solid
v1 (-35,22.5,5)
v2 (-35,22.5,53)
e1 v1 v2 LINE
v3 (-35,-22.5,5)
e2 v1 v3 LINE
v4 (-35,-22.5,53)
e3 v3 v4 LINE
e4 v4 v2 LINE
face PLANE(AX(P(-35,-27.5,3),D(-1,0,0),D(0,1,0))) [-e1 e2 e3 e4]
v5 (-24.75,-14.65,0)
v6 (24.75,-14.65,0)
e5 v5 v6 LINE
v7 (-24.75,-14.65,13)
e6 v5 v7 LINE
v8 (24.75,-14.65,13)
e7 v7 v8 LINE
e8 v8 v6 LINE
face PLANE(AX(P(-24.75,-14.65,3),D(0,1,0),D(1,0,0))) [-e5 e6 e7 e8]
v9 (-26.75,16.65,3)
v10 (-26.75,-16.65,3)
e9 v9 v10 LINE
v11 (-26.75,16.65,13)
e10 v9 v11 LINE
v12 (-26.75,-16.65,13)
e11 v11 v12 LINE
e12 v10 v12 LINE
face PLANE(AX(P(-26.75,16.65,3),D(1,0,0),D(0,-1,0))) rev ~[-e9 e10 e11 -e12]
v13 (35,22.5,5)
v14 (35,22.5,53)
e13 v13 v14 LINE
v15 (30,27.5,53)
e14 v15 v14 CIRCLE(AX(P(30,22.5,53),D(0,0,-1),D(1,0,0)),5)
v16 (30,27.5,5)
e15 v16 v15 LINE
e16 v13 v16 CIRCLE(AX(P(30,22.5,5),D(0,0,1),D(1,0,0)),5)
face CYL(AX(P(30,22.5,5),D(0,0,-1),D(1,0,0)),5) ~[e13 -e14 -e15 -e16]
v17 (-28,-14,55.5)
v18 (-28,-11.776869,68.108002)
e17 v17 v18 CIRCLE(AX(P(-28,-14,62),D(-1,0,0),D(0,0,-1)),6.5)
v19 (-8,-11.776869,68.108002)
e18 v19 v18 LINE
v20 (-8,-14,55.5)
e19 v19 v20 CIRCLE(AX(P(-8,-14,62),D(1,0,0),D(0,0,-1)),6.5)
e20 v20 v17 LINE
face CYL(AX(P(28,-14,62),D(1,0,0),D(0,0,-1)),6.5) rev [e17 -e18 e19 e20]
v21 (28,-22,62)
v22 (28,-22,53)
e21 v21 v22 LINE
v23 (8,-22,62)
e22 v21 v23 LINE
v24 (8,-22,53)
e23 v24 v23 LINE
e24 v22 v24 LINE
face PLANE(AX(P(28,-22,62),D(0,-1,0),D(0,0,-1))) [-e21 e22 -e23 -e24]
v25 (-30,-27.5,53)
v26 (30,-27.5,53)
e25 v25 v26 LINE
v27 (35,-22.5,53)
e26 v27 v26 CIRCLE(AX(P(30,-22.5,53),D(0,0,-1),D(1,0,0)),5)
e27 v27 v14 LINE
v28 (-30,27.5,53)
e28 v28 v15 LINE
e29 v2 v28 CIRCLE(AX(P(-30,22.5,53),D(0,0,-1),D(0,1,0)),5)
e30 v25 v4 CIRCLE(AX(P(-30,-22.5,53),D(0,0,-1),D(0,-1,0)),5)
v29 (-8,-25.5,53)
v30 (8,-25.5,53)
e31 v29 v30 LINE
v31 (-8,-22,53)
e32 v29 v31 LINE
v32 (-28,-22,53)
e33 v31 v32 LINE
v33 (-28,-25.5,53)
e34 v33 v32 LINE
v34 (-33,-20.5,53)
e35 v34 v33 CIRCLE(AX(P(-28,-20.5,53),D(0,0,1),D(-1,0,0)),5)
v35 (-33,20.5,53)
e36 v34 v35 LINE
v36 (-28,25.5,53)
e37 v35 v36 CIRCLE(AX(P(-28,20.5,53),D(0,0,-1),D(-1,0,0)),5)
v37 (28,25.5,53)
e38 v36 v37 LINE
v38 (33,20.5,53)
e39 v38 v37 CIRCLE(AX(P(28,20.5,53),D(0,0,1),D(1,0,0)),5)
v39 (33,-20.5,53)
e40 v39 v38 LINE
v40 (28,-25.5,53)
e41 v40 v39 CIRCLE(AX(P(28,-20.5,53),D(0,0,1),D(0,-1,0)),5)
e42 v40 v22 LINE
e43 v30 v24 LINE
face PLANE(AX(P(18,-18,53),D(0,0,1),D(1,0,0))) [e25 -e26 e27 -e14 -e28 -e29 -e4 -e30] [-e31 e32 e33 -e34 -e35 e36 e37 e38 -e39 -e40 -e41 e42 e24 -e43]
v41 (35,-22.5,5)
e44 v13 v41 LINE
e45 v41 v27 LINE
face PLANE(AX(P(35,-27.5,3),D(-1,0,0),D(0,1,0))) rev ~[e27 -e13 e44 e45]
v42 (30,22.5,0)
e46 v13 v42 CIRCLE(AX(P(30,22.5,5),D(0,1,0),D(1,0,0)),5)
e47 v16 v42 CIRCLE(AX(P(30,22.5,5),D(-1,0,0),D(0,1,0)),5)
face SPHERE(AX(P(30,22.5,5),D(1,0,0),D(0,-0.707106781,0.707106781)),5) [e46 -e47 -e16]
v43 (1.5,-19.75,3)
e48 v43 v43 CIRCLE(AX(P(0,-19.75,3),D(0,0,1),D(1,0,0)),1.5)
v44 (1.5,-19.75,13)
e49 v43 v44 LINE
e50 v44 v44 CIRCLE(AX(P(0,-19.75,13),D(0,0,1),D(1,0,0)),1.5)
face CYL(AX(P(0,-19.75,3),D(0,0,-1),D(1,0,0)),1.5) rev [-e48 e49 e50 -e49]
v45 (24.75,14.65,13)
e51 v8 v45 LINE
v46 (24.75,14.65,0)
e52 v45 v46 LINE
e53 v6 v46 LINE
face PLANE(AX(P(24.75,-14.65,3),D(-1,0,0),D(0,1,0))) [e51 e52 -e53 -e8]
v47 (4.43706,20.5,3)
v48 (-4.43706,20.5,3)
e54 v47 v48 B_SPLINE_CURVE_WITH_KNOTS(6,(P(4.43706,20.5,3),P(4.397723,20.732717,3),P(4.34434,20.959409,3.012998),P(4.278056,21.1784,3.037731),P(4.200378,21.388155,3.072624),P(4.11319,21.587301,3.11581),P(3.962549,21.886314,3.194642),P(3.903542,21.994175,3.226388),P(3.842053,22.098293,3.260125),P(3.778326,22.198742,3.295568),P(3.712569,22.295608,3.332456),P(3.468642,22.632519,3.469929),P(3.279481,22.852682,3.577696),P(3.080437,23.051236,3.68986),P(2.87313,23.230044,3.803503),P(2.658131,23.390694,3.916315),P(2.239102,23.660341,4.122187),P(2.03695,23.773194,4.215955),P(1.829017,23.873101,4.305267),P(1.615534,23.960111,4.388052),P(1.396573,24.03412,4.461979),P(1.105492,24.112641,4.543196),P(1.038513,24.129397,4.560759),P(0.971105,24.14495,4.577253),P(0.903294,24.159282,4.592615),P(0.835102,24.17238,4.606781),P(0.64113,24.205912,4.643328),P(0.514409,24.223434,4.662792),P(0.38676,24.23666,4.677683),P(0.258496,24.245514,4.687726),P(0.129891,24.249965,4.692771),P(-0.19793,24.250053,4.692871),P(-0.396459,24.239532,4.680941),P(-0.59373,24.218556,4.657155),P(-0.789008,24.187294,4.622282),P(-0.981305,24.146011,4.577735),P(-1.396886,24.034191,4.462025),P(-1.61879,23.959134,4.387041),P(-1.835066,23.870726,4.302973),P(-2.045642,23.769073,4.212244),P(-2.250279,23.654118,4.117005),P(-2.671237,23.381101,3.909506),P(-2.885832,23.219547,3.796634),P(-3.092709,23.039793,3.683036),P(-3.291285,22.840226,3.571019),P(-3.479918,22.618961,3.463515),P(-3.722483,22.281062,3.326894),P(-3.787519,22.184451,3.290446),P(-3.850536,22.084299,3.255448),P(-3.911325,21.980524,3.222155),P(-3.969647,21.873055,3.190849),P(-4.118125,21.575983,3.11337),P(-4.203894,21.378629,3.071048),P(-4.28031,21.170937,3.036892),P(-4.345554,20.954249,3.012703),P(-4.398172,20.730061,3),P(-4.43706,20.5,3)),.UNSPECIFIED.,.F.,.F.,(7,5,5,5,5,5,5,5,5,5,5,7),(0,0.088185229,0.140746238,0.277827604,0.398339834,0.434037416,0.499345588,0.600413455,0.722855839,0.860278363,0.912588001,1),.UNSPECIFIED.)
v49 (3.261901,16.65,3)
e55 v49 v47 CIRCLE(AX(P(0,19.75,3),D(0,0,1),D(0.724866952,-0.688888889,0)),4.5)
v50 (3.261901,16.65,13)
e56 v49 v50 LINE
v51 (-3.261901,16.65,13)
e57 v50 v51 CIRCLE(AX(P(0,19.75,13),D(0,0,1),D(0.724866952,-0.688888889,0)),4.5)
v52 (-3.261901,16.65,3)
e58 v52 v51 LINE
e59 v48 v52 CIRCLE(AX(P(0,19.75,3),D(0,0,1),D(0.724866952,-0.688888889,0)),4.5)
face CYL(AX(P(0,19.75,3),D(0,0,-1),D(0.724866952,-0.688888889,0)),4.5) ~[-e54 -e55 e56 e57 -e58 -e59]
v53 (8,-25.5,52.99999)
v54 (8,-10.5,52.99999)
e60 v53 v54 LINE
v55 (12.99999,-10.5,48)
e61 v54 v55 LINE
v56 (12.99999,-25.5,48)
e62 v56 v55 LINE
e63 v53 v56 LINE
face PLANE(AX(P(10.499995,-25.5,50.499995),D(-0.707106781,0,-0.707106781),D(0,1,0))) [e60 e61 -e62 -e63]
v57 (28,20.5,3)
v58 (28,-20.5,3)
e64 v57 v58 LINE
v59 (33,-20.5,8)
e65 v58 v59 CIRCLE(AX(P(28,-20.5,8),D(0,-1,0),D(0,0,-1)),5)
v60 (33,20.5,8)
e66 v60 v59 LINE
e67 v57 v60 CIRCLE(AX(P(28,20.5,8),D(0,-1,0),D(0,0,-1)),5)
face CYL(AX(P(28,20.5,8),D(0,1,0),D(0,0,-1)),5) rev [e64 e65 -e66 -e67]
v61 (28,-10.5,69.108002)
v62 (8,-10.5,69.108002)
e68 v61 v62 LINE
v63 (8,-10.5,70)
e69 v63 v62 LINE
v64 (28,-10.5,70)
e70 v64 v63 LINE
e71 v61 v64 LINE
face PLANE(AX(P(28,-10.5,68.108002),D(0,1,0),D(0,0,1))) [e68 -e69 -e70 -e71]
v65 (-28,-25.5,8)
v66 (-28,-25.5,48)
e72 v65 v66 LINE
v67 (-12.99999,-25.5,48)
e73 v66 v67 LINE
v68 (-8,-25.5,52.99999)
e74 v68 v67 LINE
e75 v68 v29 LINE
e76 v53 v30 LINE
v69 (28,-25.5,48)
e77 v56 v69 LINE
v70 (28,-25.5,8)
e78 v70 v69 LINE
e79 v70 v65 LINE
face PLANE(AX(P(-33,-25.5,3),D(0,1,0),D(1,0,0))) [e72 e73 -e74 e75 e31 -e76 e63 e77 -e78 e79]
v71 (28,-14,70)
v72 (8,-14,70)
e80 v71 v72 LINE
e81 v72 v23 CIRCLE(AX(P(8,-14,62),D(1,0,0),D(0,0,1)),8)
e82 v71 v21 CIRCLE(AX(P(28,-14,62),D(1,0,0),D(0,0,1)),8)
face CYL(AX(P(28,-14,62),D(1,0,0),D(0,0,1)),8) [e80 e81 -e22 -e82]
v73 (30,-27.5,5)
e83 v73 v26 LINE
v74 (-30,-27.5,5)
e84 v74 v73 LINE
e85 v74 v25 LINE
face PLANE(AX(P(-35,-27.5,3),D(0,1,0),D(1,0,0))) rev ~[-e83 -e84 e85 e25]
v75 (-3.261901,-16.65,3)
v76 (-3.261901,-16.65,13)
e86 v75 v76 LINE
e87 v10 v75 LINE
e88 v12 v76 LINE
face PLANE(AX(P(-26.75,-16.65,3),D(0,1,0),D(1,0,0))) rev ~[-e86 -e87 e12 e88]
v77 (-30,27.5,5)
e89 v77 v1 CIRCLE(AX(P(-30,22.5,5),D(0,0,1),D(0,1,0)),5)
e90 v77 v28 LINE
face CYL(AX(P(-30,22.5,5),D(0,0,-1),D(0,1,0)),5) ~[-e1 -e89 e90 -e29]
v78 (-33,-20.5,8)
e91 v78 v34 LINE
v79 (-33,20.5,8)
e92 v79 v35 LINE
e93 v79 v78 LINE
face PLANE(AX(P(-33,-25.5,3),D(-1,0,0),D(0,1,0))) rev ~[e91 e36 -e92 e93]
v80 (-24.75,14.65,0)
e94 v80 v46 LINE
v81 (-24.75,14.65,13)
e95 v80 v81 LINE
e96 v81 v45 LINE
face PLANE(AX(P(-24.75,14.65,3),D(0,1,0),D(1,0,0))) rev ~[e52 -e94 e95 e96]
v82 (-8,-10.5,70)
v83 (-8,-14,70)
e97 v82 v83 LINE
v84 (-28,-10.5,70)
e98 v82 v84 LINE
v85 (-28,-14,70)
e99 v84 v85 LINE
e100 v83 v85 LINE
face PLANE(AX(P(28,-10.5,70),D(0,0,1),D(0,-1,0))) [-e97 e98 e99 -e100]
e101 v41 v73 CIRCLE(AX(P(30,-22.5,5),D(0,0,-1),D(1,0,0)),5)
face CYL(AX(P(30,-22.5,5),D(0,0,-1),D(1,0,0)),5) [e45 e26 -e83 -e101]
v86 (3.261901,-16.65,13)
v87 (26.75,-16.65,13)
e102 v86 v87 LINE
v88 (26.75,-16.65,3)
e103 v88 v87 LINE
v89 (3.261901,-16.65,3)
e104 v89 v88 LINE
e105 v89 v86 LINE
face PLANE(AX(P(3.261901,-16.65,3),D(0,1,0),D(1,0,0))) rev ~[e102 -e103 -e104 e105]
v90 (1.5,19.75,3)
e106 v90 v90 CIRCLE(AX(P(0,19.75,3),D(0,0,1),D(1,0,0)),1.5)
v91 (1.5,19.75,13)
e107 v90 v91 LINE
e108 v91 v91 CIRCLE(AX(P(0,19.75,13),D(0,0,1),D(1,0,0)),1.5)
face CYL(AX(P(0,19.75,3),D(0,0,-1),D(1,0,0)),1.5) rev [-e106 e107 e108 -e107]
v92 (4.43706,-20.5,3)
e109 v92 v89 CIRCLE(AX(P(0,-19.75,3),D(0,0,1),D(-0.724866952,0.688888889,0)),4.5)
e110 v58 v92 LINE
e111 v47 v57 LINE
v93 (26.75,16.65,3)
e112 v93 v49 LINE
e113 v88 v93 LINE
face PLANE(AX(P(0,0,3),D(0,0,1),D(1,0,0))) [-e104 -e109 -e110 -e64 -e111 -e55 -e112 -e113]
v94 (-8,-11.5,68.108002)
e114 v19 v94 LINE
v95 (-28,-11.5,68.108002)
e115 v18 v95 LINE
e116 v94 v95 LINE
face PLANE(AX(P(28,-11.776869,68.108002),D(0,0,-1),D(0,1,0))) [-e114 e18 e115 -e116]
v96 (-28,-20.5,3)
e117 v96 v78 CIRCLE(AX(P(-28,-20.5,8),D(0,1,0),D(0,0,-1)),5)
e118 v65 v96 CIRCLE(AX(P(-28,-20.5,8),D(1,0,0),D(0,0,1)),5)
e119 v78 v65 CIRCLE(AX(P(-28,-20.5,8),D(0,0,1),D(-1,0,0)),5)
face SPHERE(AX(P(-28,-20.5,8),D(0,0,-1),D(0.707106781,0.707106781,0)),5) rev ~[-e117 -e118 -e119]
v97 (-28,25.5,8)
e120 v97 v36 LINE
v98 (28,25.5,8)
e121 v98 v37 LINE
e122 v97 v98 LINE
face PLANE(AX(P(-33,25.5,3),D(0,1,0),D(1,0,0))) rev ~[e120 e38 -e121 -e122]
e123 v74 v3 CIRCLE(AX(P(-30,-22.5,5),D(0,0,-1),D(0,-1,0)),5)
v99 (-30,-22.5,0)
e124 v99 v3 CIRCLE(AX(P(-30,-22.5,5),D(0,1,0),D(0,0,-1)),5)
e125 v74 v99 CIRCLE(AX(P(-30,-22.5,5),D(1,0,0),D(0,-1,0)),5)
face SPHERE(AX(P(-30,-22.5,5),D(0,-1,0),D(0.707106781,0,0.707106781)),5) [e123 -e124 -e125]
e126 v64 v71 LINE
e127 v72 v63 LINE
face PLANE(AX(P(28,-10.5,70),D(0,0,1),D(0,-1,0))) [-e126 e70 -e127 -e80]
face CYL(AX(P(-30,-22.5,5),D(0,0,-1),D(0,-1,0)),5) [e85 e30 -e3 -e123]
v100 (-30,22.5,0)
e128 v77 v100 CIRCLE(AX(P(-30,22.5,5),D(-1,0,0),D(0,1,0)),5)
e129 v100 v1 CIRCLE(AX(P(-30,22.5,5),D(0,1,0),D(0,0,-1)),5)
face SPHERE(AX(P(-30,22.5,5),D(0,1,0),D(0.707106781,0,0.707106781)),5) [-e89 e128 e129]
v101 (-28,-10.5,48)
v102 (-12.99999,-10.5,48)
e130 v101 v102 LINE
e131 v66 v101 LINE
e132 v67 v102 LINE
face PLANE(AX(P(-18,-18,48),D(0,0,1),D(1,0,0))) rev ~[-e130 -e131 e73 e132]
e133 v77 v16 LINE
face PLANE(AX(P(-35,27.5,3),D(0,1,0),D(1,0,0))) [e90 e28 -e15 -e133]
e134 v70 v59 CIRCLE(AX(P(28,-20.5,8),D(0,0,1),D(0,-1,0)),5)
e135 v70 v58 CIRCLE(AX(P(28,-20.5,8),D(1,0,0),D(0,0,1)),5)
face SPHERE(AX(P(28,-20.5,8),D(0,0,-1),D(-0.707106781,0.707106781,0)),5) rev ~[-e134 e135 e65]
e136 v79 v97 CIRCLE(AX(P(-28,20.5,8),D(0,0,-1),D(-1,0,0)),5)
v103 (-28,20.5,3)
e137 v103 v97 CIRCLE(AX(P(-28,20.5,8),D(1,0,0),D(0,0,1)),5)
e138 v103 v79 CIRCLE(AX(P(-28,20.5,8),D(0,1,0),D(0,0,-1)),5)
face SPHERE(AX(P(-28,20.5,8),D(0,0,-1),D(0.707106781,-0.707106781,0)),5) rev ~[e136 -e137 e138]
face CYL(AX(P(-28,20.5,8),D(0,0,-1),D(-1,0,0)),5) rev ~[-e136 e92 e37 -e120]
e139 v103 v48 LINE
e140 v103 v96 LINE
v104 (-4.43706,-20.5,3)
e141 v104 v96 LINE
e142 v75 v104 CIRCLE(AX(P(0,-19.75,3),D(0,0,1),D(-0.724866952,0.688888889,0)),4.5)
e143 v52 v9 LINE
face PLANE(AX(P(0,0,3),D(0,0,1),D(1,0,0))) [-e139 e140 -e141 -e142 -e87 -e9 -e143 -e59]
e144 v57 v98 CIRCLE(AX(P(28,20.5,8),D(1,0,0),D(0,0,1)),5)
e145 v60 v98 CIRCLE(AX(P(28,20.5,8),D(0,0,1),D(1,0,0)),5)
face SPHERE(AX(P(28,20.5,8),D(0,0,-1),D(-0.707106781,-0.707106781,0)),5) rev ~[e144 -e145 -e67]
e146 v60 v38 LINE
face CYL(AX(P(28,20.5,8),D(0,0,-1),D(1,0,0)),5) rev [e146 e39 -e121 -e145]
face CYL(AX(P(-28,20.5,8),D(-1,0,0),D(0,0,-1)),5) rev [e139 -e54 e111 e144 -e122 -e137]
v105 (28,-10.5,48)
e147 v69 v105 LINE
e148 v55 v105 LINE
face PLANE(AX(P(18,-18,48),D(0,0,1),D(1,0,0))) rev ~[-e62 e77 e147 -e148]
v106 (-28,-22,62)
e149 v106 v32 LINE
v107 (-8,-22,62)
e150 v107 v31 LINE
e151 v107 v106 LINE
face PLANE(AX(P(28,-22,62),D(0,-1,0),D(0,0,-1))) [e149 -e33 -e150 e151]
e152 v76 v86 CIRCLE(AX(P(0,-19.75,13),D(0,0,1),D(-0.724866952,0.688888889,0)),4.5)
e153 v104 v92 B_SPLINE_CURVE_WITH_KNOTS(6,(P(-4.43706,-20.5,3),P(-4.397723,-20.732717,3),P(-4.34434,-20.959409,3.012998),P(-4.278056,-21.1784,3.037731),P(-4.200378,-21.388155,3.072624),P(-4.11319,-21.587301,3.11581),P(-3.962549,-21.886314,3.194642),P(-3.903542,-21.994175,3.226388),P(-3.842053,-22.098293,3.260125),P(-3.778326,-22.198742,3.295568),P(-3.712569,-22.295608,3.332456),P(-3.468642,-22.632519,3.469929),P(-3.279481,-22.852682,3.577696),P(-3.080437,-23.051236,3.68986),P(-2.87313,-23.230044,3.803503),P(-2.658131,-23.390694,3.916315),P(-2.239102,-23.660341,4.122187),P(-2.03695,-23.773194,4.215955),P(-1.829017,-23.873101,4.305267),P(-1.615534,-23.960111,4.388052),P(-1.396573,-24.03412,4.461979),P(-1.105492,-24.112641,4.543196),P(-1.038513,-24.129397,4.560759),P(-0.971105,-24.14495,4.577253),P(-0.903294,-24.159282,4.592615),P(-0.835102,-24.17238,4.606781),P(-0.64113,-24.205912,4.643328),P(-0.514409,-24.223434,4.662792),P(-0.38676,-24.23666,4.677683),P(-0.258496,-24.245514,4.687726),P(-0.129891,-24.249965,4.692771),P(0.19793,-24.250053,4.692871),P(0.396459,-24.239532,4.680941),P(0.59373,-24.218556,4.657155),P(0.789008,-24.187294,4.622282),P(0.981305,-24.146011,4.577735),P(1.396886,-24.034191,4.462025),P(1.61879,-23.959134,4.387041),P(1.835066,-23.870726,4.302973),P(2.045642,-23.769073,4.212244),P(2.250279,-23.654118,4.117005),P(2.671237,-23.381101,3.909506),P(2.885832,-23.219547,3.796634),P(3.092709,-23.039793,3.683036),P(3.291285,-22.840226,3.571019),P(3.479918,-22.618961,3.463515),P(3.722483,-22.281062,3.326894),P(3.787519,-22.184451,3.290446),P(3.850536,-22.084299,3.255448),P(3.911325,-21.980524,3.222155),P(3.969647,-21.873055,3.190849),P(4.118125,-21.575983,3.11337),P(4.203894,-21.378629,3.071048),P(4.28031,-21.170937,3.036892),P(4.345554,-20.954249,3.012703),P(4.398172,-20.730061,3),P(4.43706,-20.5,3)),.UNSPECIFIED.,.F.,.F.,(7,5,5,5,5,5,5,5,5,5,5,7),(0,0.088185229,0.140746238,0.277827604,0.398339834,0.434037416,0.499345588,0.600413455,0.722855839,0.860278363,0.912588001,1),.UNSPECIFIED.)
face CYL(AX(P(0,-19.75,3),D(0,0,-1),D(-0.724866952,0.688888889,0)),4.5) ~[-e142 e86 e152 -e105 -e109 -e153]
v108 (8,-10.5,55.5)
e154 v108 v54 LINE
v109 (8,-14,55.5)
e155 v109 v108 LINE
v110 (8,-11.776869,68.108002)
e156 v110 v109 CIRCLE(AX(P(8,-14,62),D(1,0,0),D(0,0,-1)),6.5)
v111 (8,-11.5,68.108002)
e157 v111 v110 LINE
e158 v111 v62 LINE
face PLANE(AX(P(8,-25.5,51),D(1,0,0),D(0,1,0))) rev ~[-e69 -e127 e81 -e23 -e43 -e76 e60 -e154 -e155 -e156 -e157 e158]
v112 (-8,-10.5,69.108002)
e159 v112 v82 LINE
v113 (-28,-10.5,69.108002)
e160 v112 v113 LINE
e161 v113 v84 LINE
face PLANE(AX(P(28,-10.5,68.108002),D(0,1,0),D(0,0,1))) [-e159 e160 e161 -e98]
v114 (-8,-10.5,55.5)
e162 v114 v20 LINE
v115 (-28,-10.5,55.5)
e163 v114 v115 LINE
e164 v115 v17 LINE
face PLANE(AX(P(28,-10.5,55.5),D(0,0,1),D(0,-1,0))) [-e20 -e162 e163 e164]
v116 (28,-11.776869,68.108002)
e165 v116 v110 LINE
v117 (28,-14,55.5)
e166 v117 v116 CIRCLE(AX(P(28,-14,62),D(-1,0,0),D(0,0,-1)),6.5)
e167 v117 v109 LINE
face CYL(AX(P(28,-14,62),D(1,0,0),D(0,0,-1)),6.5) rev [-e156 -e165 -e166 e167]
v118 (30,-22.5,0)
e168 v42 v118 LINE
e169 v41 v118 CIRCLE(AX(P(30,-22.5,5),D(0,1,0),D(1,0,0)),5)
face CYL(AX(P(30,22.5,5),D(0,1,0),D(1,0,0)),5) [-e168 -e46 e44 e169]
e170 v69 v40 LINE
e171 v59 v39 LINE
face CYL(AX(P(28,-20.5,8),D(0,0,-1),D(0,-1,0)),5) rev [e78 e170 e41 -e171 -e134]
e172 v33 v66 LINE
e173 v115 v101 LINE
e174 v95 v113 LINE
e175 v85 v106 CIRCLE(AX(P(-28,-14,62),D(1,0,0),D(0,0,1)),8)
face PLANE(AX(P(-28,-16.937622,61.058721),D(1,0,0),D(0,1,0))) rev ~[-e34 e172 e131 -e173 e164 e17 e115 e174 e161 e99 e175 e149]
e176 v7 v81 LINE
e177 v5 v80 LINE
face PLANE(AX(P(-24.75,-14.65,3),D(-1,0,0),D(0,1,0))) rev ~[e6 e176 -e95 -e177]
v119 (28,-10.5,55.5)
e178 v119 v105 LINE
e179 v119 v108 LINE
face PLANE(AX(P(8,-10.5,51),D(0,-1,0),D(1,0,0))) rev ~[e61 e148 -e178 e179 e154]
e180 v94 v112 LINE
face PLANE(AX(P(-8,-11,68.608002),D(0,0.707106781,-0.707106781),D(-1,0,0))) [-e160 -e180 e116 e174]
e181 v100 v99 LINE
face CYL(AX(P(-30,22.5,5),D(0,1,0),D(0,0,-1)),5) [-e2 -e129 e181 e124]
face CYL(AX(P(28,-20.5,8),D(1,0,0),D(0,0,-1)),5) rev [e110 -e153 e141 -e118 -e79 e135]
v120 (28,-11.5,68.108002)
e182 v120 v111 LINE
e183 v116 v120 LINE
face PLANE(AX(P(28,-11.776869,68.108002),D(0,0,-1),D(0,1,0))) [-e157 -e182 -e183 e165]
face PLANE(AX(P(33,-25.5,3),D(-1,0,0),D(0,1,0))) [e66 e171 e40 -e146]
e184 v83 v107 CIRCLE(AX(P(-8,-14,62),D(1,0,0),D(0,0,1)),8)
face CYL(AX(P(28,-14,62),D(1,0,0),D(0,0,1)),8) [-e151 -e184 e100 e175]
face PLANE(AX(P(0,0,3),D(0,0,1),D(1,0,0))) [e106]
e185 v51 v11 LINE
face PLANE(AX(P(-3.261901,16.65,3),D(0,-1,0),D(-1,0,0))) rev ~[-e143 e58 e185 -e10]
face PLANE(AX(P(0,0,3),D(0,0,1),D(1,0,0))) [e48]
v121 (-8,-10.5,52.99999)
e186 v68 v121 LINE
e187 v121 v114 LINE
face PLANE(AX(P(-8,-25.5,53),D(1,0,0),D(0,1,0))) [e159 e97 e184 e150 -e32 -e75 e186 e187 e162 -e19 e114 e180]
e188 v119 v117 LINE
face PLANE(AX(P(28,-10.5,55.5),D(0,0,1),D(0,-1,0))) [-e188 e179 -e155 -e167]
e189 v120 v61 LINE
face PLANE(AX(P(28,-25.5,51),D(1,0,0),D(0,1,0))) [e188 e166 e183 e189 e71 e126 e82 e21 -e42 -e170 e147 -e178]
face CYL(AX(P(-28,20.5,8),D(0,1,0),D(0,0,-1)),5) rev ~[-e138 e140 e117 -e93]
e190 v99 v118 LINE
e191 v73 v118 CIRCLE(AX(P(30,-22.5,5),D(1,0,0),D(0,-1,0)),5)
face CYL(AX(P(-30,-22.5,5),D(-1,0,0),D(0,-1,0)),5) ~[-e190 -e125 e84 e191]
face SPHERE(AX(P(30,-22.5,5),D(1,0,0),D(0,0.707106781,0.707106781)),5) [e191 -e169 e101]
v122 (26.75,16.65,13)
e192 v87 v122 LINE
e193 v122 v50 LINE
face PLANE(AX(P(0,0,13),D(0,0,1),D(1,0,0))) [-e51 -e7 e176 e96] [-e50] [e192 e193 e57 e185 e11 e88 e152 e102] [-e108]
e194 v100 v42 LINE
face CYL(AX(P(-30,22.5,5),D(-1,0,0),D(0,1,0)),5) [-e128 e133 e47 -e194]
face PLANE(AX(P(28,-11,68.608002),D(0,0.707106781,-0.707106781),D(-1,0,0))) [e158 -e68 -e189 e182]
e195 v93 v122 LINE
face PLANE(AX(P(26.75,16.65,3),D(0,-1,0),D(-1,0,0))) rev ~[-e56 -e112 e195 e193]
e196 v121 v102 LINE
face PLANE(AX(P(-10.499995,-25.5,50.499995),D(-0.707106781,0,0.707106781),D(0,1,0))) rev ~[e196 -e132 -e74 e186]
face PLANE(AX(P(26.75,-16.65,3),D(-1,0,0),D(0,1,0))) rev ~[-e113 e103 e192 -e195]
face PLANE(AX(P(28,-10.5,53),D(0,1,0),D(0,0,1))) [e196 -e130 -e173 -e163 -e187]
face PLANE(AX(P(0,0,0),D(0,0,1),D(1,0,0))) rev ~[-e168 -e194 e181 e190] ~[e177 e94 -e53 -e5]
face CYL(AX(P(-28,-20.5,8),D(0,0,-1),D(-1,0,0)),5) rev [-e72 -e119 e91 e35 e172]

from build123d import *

# Parameters (mm, degrees)
F0_W         = 70
F0_H         = 55
F0_W_2       = 49.5
F0_H_2       = 29.3
F1_DEPTH     = 3
F2_R         = 1.5
F2_W         = 49.5
F2_H         = 29.3
F3_DEPTH     = 10
F2_W_2       = 70
F2_H_2       = 55
F2_W_3       = 66
F2_H_3       = 51
F4_DEPTH     = 50
F5_T1_DEPTH  = 45
F5_T3_DEPTH  = 41
F5_S7_W      = 5.1
F5_S7_H      = 5.1
F5_T8_DEPTH  = 5.1
F5_S13_W     = 5.1
F5_S13_H     = 5.1
F5_T14_DEPTH = 5.1
F5_S19_W     = 5.1
F5_S19_H     = 5.1
F5_T20_DEPTH = 5.1
F5_S25_W     = 5.1
F5_S25_H     = 5.1
F5_T26_DEPTH = 5.1
F5_T32_DEPTH = 56
F5_S33_R     = 4.5
F5_T34_DEPTH = 30
F5_T38_DEPTH = 56
F5_S39_R     = 4.5
F5_T40_DEPTH = 30
F5_T41_DEPTH = 45
F5_T43_DEPTH = 60.5
F5_T45_DEPTH = 60
F5_S49_W     = 5.1
F5_S49_H     = 5.1
F5_T50_DEPTH = 5.1
F5_S55_W     = 5.1
F5_S55_H     = 5.1
F5_T56_DEPTH = 5.1
F5_S61_W     = 5.1
F5_S61_H     = 5.1
F5_T62_DEPTH = 5.1
F5_S67_W     = 5.1
F5_S67_H     = 5.1
F5_T68_DEPTH = 5.1
F6_W         = 20
F6_H         = 15
F7_DEPTH     = 2
F9_DEPTH     = 56
F10_W        = 16
F10_H        = 9
F10_H_2      = 13.2445012331
F11_DEPTH    = 25
F12_DEPTH    = 3
F13_SIZE     = 4.99999
F14_SIZE     = 1


# Not quite as in the source:
# - a fillet or chamfer that OpenCascade refuses, or shapes differently, is made with other operations: its cross-section is extruded or revolved along the edge and cut away or added
# - a fillet or chamfer is up to 0.001 mm smaller than in the source, because OpenCascade refuses the exact size


with BuildPart() as f1:
    # F0 (on Top) → F1 (new body)
    with BuildSketch(Plane.XY):
        Rectangle(F0_W, F0_H)
        Rectangle(F0_W_2, F0_H_2, mode=Mode.SUBTRACT)
    extrude(amount=F1_DEPTH)

    # F2 (on face) → F3 (join)
    with BuildSketch(Plane.XY.offset(3)):
        with BuildLine():
            Line((-3.2619012861, 16.65), (-26.75, 16.65))
            Line((-26.75, 16.65), (-26.75, -16.65))
            Line((-26.75, -16.65), (-3.2619012861, -16.65))
            ThreePointArc((-3.2619012861, -16.65), (0, -24.25), (3.2619012861, -16.65))
            Line((3.2619012861, -16.65), (26.75, -16.65))
            Line((26.75, -16.65), (26.75, 16.65))
            Line((26.75, 16.65), (3.2619012861, 16.65))
            ThreePointArc((3.2619012861, 16.65), (0, 24.25), (-3.2619012861, 16.65))
        make_face()
        with Locations((0, -19.75)):
            Circle(F2_R, mode=Mode.SUBTRACT)
        Rectangle(F2_W, F2_H, mode=Mode.SUBTRACT)
        with Locations((0, 19.75)):
            Circle(F2_R, mode=Mode.SUBTRACT)
    extrude(amount=F3_DEPTH)

    # F2 (on face) → F4 (join)
    with BuildSketch(Plane.XY.offset(3)):
        Rectangle(F2_W_2, F2_H_2)
        Rectangle(F2_W_3, F2_H_3, mode=Mode.SUBTRACT)
    extrude(amount=F4_DEPTH)

    # F5: fillet of radius 5 on 16 edges, made by hand

    # F5_s2 → F5_t1 (join)
    with BuildSketch(Plane.XY.offset(8)):
        with BuildLine():
            ThreePointArc((-33, 20.5), (-31.5355339059, 24.0355339059), (-28, 25.5))
            Line((-28, 25.5), (-33, 25.5))
            Line((-33, 25.5), (-33, 20.5))
        make_face()
        with BuildLine():
            ThreePointArc((33, 20.5), (31.5355339059, 24.0355339059), (28, 25.5))
            Line((28, 25.5), (33, 25.5))
            Line((33, 25.5), (33, 20.5))
        make_face()
        with BuildLine():
            ThreePointArc((-33, -20.5), (-31.5355339059, -24.0355339059), (-28, -25.5))
            Line((-28, -25.5), (-33, -25.5))
            Line((-33, -25.5), (-33, -20.5))
        make_face()
        with BuildLine():
            ThreePointArc((28, -25.5), (31.5355339059, -24.0355339059), (33, -20.5))
            Line((33, -20.5), (33, -25.5))
            Line((33, -25.5), (28, -25.5))
        make_face()
    extrude(amount=F5_T1_DEPTH)

    # F5_s4 → F5_t3 (join)
    with BuildSketch(Plane.XZ.offset(-20.5)):
        with BuildLine():
            ThreePointArc((-28, 3), (-31.5355339059, 4.4644660941), (-33, 8))
            Line((-33, 8), (-33, 3))
            Line((-33, 3), (-28, 3))
        make_face()
        with BuildLine():
            ThreePointArc((28, 3), (31.5355339059, 4.4644660941), (33, 8))
            Line((33, 8), (33, 3))
            Line((33, 3), (28, 3))
        make_face()
    extrude(amount=F5_T3_DEPTH)


with BuildPart() as f5_tool6:
    # F5_s7 → F5_t8 (new body)
    with BuildSketch(Plane.XY.offset(8)):
        with Locations((-30.55, 23.05)):
            Rectangle(F5_S7_W, F5_S7_H)
    extrude(amount=-F5_T8_DEPTH)

    # F5_s9 → F5_t10 (revolve, cut)
    with BuildSketch(Plane(origin=(-28, 20.5, 8), x_dir=(0.7071067812, -0.7071067812, 0), z_dir=(0.7071067812, 0.7071067812, 0))):
        with BuildLine():
            ThreePointArc((0, -5), (5, 0), (0, 5))
            Line((0, 5), (0, -5))
        make_face()
    revolve(axis=Axis((-28, 20.5, 8), (0, 0, -1)), mode=Mode.SUBTRACT)


with BuildPart() as f1_1:
    add(f1.part)

    # F5_t5: union F5_tool6
    add(f5_tool6.part)


with BuildPart() as f5_tool12:
    # F5_s13 → F5_t14 (new body)
    with BuildSketch(Plane.XY.offset(8)):
        with Locations((30.55, 23.05)):
            Rectangle(F5_S13_W, F5_S13_H)
    extrude(amount=-F5_T14_DEPTH)

    # F5_s15 → F5_t16 (revolve, cut)
    with BuildSketch(Plane(origin=(28, 20.5, 8), x_dir=(-0.7071067812, -0.7071067812, 0), z_dir=(0.7071067812, -0.7071067812, 0))):
        with BuildLine():
            ThreePointArc((0, -5), (5, 0), (0, 5))
            Line((0, 5), (0, -5))
        make_face()
    revolve(axis=Axis((28, 20.5, 8), (0, 0, -1)), mode=Mode.SUBTRACT)


with BuildPart() as f1_2:
    add(f1_1.part)

    # F5_t11: union F5_tool12
    add(f5_tool12.part)


with BuildPart() as f5_tool18:
    # F5_s19 → F5_t20 (new body)
    with BuildSketch(Plane.XY.offset(8)):
        with Locations((-30.55, -23.05)):
            Rectangle(F5_S19_W, F5_S19_H)
    extrude(amount=-F5_T20_DEPTH)

    # F5_s21 → F5_t22 (revolve, cut)
    with BuildSketch(Plane(origin=(-28, -20.5, 8), x_dir=(0.7071067812, 0.7071067812, 0), z_dir=(-0.7071067812, 0.7071067812, 0))):
        with BuildLine():
            ThreePointArc((0, -5), (5, 0), (0, 5))
            Line((0, 5), (0, -5))
        make_face()
    revolve(axis=Axis((-28, -20.5, 8), (0, 0, -1)), mode=Mode.SUBTRACT)


with BuildPart() as f1_3:
    add(f1_2.part)

    # F5_t17: union F5_tool18
    add(f5_tool18.part)


with BuildPart() as f5_tool24:
    # F5_s25 → F5_t26 (new body)
    with BuildSketch(Plane.XY.offset(8)):
        with Locations((30.55, -23.05)):
            Rectangle(F5_S25_W, F5_S25_H)
    extrude(amount=-F5_T26_DEPTH)

    # F5_s27 → F5_t28 (revolve, cut)
    with BuildSketch(Plane(origin=(28, -20.5, 8), x_dir=(-0.7071067812, 0.7071067812, 0), z_dir=(-0.7071067812, -0.7071067812, 0))):
        with BuildLine():
            ThreePointArc((0, -5), (5, 0), (0, 5))
            Line((0, 5), (0, -5))
        make_face()
    revolve(axis=Axis((28, -20.5, 8), (0, 0, -1)), mode=Mode.SUBTRACT)


with BuildPart() as f1_4:
    add(f1_3.part)

    # F5_t23: union F5_tool24
    add(f5_tool24.part)


with BuildPart() as f5_tool30:
    # F5_s31 → F5_t32 (new body)
    with BuildSketch(Plane.YZ.offset(-28)):
        with BuildLine():
            ThreePointArc((20.5, 3), (24.0355339059, 4.4644660941), (25.5, 8))
            Line((25.5, 8), (25.5, 3))
            Line((25.5, 3), (20.5, 3))
        make_face()
    extrude(amount=F5_T32_DEPTH)

    # F5_s33 → F5_t34 (cut, symmetric)
    with BuildSketch(Plane.XY.offset(5.5)):
        with Locations((0, 19.75)):
            Circle(F5_S33_R)
    extrude(amount=F5_T34_DEPTH, both=True, mode=Mode.SUBTRACT)


with BuildPart() as f1_5:
    add(f1_4.part)

    # F5_t29: union F5_tool30
    add(f5_tool30.part)


with BuildPart() as f5_tool36:
    # F5_s37 → F5_t38 (new body)
    with BuildSketch(Plane.YZ.offset(28)):
        with BuildLine():
            ThreePointArc((-20.5, 3), (-24.0355339059, 4.4644660941), (-25.5, 8))
            Line((-25.5, 8), (-25.5, 3))
            Line((-25.5, 3), (-20.5, 3))
        make_face()
    extrude(amount=-F5_T38_DEPTH)

    # F5_s39 → F5_t40 (cut, symmetric)
    with BuildSketch(Plane.XY.offset(5.5)):
        with Locations((0, -19.75)):
            Circle(F5_S39_R)
    extrude(amount=F5_T40_DEPTH, both=True, mode=Mode.SUBTRACT)


with BuildPart() as f1_6:
    add(f1_5.part)

    # F5_t35: union F5_tool36
    add(f5_tool36.part)

    # F5_s42 → F5_t41 (cut)
    with BuildSketch(Plane.XZ.offset(-22.5)):
        with BuildLine():
            ThreePointArc((-30, 0), (-33.5355339059, 1.4644660941), (-35, 5))
            Line((-35, 5), (-35, 0))
            Line((-35, 0), (-30, 0))
        make_face()
        with BuildLine():
            ThreePointArc((35, 5), (33.5355339059, 1.4644660941), (30, 0))
            Line((30, 0), (35, 0))
            Line((35, 0), (35, 5))
        make_face()
    extrude(amount=F5_T41_DEPTH, mode=Mode.SUBTRACT)

    # F5_s44 → F5_t43 (cut)
    with BuildSketch(Plane.XY.offset(5)):
        with BuildLine():
            ThreePointArc((-30, 27.5), (-33.5355339059, 26.0355339059), (-35, 22.5))
            Line((-35, 22.5), (-35, 27.5))
            Line((-35, 27.5), (-30, 27.5))
        make_face()
        with BuildLine():
            ThreePointArc((-30, -27.5), (-33.5355339059, -26.0355339059), (-35, -22.5))
            Line((-35, -22.5), (-35, -27.5))
            Line((-35, -27.5), (-30, -27.5))
        make_face()
        with BuildLine():
            ThreePointArc((35, 22.5), (33.5355339059, 26.0355339059), (30, 27.5))
            Line((30, 27.5), (35, 27.5))
            Line((35, 27.5), (35, 22.5))
        make_face()
        with BuildLine():
            ThreePointArc((35, -22.5), (33.5355339059, -26.0355339059), (30, -27.5))
            Line((30, -27.5), (35, -27.5))
            Line((35, -27.5), (35, -22.5))
        make_face()
    extrude(amount=F5_T43_DEPTH, mode=Mode.SUBTRACT)

    # F5_s46 → F5_t45 (cut)
    with BuildSketch(Plane.YZ.offset(-30)):
        with BuildLine():
            ThreePointArc((27.5, 5), (26.0355339059, 1.4644660941), (22.5, 0))
            Line((22.5, 0), (27.5, 0))
            Line((27.5, 0), (27.5, 5))
        make_face()
        with BuildLine():
            ThreePointArc((-27.5, 5), (-26.0355339059, 1.4644660941), (-22.5, 0))
            Line((-22.5, 0), (-27.5, 0))
            Line((-27.5, 0), (-27.5, 5))
        make_face()
    extrude(amount=F5_T45_DEPTH, mode=Mode.SUBTRACT)


with BuildPart() as f5_tool48:
    # F5_s49 → F5_t50 (new body)
    with BuildSketch(Plane.XZ.offset(-22.5)):
        with Locations((-32.55, 2.45)):
            Rectangle(F5_S49_W, F5_S49_H)
    extrude(amount=-F5_T50_DEPTH)

    # F5_s51 → F5_t52 (revolve, cut)
    with BuildSketch(Plane(origin=(-30, 22.5, 5), x_dir=(0.7071067812, 0, 0.7071067812), z_dir=(-0.7071067812, 0, 0.7071067812))):
        with BuildLine():
            ThreePointArc((0, -5), (5, 0), (0, 5))
            Line((0, 5), (0, -5))
        make_face()
    revolve(axis=Axis((-30, 22.5, 5), (0, 1, 0)), mode=Mode.SUBTRACT)


with BuildPart() as f1_7:
    add(f1_6.part)

    # F5_t47: cut F5_tool48
    add(f5_tool48.part, mode=Mode.SUBTRACT)


with BuildPart() as f5_tool54:
    # F5_s55 → F5_t56 (new body)
    with BuildSketch(Plane.XZ.offset(22.5)):
        with Locations((-32.55, 2.45)):
            Rectangle(F5_S55_W, F5_S55_H)
    extrude(amount=F5_T56_DEPTH)

    # F5_s57 → F5_t58 (revolve, cut)
    with BuildSketch(Plane(origin=(-30, -22.5, 5), x_dir=(0.7071067812, 0, 0.7071067812), z_dir=(0.7071067812, 0, -0.7071067812))):
        with BuildLine():
            ThreePointArc((0, -5), (5, 0), (0, 5))
            Line((0, 5), (0, -5))
        make_face()
    revolve(axis=Axis((-30, -22.5, 5), (0, -1, 0)), mode=Mode.SUBTRACT)


with BuildPart() as f1_8:
    add(f1_7.part)

    # F5_t53: cut F5_tool54
    add(f5_tool54.part, mode=Mode.SUBTRACT)


with BuildPart() as f5_tool60:
    # F5_s61 → F5_t62 (new body)
    with BuildSketch(Plane.YZ.offset(30)):
        with Locations((25.05, 2.45)):
            Rectangle(F5_S61_W, F5_S61_H)
    extrude(amount=F5_T62_DEPTH)

    # F5_s63 → F5_t64 (revolve, cut)
    with BuildSketch(Plane(origin=(30, 22.5, 5), x_dir=(0, -0.7071067812, 0.7071067812), z_dir=(0, 0.7071067812, 0.7071067812))):
        with BuildLine():
            ThreePointArc((0, -5), (5, 0), (0, 5))
            Line((0, 5), (0, -5))
        make_face()
    revolve(axis=Axis((30, 22.5, 5), (1, 0, 0)), mode=Mode.SUBTRACT)


with BuildPart() as f1_9:
    add(f1_8.part)

    # F5_t59: cut F5_tool60
    add(f5_tool60.part, mode=Mode.SUBTRACT)


with BuildPart() as f5_tool66:
    # F5_s67 → F5_t68 (new body)
    with BuildSketch(Plane.YZ.offset(30)):
        with Locations((-25.05, 2.45)):
            Rectangle(F5_S67_W, F5_S67_H)
    extrude(amount=F5_T68_DEPTH)

    # F5_s69 → F5_t70 (revolve, cut)
    with BuildSketch(Plane(origin=(30, -22.5, 5), x_dir=(0, 0.7071067812, 0.7071067812), z_dir=(0, 0.7071067812, -0.7071067812))):
        with BuildLine():
            ThreePointArc((0, -5), (5, 0), (0, 5))
            Line((0, 5), (0, -5))
        make_face()
    revolve(axis=Axis((30, -22.5, 5), (1, 0, 0)), mode=Mode.SUBTRACT)


with BuildPart() as f1_10:
    add(f1_9.part)

    # F5_t65: cut F5_tool66
    add(f5_tool66.part, mode=Mode.SUBTRACT)

    # F6 (on face) → F7 (join)
    with BuildSketch(Plane.XY.offset(53)):
        with Locations((18, -18)):
            Rectangle(F6_W, F6_H)
        with Locations((-18, -18)):
            Rectangle(F6_W, F6_H)
    extrude(amount=-F7_DEPTH)

    # F8 (on face) → F9 (join)
    with BuildSketch(Plane.YZ.offset(28)):
        with BuildLine():
            ThreePointArc((-14, 55.5), (-20.4012503946, 63.1287131548), (-11.7768690684, 68.1080020351))
            Line((-11.7768690684, 68.1080020351), (-10.5, 68.1080020351))
            Line((-10.5, 68.1080020351), (-10.5, 70))
            Line((-10.5, 70), (-14, 70))
            ThreePointArc((-14, 70), (-19.6568542495, 67.6568542495), (-22, 62))
            Line((-22, 62), (-22, 53))
            Line((-22, 53), (-10.5, 53))
            Line((-10.5, 53), (-10.5, 55.5))
            Line((-10.5, 55.5), (-14, 55.5))
        make_face()
    extrude(amount=-F9_DEPTH)

    # F10 (on face) → F11 (cut)
    with BuildSketch(Plane.XZ.offset(22)):
        with Locations((0, 57.5)):
            Rectangle(F10_W, F10_H)
        with Locations((0, 68.6222506166)):
            Rectangle(F10_W, F10_H_2)
    extrude(amount=-F11_DEPTH, mode=Mode.SUBTRACT)

    # F12 (add): faces of the model
    f12_faces = [f1_10.faces().sort_by_distance(p)[0] for p in [
        (18, -18, 51),
        (-18, -18, 51),
    ]]
    extrude(f12_faces, amount=F12_DEPTH)

    # F13 (size 5 in the source; OpenCascade refuses exactly that, so slightly less here)
    f13_edges = [f1_10.edges().sort_by_distance(p)[0] for p in [
        (-8, -18, 48),
        (8, -18, 48),
    ]]
    chamfer(f13_edges, length=F13_SIZE)

    # F14
    f14_edges = [f1_10.edges().sort_by_distance(p)[0] for p in [
        (18, -10.5, 68.108002),
        (-18, -10.5, 68.108002),
    ]]
    chamfer(f14_edges, length=F14_SIZE)


solid = f1_10.part
